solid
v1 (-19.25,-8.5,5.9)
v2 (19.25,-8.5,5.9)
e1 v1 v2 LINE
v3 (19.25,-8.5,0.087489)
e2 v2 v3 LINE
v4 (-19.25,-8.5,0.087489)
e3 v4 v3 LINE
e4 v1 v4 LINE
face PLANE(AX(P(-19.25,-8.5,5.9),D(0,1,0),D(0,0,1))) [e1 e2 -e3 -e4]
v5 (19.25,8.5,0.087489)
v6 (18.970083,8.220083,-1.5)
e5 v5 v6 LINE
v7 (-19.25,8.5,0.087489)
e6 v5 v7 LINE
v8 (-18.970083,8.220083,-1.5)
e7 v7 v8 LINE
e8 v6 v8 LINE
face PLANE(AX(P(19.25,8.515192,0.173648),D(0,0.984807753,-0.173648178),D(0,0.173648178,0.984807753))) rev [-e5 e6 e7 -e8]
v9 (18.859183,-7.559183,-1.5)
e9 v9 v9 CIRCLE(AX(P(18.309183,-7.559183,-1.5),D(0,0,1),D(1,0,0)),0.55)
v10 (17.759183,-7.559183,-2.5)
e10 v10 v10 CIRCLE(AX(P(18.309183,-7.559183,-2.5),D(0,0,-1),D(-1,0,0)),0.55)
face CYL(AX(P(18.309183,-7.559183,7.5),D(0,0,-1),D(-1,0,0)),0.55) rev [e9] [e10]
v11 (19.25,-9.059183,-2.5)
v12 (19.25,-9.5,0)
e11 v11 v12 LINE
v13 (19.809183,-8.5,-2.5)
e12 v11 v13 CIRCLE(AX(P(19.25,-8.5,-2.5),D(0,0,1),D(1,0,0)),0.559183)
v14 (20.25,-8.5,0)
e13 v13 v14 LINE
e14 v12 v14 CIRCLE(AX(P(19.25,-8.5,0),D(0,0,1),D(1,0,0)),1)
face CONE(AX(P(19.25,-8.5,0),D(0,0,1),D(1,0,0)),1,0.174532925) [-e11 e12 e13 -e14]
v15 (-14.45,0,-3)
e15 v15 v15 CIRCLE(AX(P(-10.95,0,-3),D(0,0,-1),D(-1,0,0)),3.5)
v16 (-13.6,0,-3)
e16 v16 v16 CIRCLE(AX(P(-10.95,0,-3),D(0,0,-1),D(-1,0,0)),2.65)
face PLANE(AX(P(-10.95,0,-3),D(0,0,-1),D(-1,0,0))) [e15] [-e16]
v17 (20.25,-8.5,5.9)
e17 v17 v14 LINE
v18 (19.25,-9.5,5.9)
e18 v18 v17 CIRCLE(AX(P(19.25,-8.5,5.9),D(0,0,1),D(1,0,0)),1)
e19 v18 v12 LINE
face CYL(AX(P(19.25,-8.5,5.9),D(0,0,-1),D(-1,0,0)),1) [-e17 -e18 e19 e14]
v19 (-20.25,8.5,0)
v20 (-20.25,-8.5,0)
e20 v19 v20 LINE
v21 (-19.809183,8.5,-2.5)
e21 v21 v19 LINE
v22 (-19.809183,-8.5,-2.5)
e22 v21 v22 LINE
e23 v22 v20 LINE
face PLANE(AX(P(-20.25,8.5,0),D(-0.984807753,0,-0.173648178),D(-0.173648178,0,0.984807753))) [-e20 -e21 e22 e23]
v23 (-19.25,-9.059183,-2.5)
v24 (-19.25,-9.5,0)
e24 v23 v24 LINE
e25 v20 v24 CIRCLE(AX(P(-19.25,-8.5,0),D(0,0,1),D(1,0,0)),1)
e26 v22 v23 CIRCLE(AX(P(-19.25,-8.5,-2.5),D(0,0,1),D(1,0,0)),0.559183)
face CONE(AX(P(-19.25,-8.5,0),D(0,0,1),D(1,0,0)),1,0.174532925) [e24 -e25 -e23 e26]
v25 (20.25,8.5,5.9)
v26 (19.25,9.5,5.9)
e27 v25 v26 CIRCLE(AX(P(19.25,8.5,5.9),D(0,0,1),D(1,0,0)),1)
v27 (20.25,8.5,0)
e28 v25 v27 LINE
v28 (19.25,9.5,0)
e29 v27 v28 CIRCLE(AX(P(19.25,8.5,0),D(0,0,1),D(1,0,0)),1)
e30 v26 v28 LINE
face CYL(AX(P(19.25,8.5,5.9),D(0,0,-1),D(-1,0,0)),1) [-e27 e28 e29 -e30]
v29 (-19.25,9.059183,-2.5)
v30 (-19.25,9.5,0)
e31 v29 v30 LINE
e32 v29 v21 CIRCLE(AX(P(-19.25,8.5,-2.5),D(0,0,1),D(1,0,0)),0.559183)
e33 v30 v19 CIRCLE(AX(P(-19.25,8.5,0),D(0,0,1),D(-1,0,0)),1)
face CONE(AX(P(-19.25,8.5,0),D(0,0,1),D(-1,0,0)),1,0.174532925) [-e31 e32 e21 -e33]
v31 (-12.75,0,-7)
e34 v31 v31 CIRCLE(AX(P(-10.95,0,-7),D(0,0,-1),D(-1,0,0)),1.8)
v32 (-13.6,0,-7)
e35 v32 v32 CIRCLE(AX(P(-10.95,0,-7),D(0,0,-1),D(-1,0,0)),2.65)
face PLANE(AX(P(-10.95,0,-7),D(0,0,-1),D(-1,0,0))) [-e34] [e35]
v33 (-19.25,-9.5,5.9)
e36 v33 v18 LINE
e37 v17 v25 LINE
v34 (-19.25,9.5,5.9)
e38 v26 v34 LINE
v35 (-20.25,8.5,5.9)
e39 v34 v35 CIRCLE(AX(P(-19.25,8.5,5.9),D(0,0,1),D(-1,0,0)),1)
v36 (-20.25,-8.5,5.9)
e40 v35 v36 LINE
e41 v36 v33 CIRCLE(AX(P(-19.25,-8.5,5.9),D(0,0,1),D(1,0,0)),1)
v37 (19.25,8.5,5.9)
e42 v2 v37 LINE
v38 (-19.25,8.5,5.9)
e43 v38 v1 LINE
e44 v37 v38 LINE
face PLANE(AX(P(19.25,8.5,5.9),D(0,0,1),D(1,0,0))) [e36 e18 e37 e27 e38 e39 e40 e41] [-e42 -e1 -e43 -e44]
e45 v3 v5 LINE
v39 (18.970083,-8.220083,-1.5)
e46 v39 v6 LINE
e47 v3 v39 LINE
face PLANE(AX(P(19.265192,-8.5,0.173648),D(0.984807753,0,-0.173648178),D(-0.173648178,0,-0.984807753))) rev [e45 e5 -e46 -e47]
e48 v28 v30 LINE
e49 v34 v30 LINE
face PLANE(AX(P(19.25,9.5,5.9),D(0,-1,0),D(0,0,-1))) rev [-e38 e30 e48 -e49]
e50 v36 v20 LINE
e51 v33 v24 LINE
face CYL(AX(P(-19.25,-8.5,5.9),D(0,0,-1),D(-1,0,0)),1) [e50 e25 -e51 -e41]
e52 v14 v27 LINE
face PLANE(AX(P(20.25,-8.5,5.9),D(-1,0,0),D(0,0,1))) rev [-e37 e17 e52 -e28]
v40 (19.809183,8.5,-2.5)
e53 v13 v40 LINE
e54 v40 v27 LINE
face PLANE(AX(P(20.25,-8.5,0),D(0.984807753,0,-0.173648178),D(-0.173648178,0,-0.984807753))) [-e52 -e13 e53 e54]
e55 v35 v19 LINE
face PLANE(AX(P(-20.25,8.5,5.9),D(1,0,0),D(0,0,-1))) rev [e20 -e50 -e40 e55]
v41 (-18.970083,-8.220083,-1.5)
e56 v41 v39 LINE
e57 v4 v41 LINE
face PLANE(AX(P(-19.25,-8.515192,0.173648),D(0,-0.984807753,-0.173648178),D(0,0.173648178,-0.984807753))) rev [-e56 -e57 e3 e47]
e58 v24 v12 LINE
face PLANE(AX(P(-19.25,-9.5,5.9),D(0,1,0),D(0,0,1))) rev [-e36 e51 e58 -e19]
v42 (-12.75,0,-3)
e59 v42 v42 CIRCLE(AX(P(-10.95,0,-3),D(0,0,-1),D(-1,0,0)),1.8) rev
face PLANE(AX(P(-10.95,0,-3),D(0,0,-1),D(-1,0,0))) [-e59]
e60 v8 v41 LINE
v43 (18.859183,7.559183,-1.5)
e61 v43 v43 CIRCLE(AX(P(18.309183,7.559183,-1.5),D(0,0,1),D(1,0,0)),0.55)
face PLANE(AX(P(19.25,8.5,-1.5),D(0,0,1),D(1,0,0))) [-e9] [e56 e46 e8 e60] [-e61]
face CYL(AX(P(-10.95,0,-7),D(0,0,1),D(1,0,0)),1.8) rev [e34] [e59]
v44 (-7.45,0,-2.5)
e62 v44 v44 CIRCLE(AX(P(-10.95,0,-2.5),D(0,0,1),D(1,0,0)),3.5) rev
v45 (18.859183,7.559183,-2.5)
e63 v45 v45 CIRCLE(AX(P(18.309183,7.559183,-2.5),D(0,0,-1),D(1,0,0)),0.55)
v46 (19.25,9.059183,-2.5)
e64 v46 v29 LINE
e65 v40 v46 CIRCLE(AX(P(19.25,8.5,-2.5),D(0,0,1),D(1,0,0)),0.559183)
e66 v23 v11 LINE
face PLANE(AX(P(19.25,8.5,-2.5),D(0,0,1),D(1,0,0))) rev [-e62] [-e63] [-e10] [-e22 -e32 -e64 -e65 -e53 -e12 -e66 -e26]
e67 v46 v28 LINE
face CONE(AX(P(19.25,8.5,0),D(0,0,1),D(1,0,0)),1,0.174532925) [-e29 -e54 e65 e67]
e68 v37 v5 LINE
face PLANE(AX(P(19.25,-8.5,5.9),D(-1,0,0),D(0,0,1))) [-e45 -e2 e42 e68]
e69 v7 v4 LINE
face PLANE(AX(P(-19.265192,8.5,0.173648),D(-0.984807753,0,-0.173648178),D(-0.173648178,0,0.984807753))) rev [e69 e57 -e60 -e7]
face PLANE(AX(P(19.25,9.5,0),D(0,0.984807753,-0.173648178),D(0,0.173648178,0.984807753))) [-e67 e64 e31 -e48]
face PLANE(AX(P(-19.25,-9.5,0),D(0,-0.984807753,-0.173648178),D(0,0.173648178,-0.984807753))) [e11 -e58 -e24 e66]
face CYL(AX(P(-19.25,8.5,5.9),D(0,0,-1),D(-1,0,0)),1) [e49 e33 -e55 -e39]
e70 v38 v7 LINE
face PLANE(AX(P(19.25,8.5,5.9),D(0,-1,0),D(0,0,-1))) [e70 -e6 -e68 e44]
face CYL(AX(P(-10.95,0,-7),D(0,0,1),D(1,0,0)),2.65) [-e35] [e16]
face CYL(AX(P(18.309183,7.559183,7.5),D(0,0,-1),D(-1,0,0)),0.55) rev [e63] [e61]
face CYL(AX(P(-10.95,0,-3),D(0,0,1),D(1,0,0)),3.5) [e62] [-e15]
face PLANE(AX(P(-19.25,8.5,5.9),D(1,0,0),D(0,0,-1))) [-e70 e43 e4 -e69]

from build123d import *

# Parameters (mm, degrees)
SALIENTE_EXTRUIR1_DEPTH = 5.9
SALIENTE_EXTRUIR2_DEPTH = 2.5
SALIENTE_EXTRUIR2_DRAFT = -10
VACIADO1_START          = -8.5
VACIADO1_DEPTH          = 17
VACIADO1_START_2        = -19.25
VACIADO1_2_DEPTH        = 38.5
SKETCH1_R               = 3.5
BOSS_EXTRUDE1_DEPTH     = 0.5
SKETCH2_R               = 2.65
SKETCH2_R_2             = 1.8
BOSS_EXTRUDE2_DEPTH     = 4
SKETCH3_R               = 0.55
CUT_EXTRUDE1_DEPTH      = 10


with BuildPart() as part:
    # Croquis1 → Saliente-Extruir1 (new body)
    with BuildSketch(Plane.XY):
        with BuildLine():
            Line((-20.25, 8.5), (-20.25, -8.5))
            ThreePointArc((-20.25, -8.5), (-19.957106781, -9.207106781), (-19.25, -9.5))
            Line((-19.25, -9.5), (19.25, -9.5))
            ThreePointArc((19.25, -9.5), (19.957106781, -9.207106781), (20.25, -8.5))
            Line((20.25, -8.5), (20.25, 8.5))
            ThreePointArc((20.25, 8.5), (19.957106781, 9.207106781), (19.25, 9.5))
            Line((19.25, 9.5), (-19.25, 9.5))
            ThreePointArc((-19.25, 9.5), (-19.957106781, 9.207106781), (-20.25, 8.5))
        make_face()
    extrude(amount=SALIENTE_EXTRUIR1_DEPTH)


with BuildPart() as saliente_extruir2_tool:
    # Croquis1<2> → Saliente-Extruir2 (with draft: the straight prism first)
    with BuildSketch(Plane.XY):
        with BuildLine():
            Line((-20.25, 8.5), (-20.25, -8.5))
            ThreePointArc((-20.25, -8.5), (-19.957106781, -9.207106781), (-19.25, -9.5))
            Line((-19.25, -9.5), (19.25, -9.5))
            ThreePointArc((19.25, -9.5), (19.957106781, -9.207106781), (20.25, -8.5))
            Line((20.25, -8.5), (20.25, 8.5))
            ThreePointArc((20.25, 8.5), (19.957106781, 9.207106781), (19.25, 9.5))
            Line((19.25, 9.5), (-19.25, 9.5))
            ThreePointArc((-19.25, 9.5), (-19.957106781, 9.207106781), (-20.25, 8.5))
        make_face()
    extrude(amount=-SALIENTE_EXTRUIR2_DEPTH)
    # Saliente-Extruir2: the draft: its side faces are tilted about the plane it starts from
    saliente_extruir2_sides = [saliente_extruir2_tool.faces().sort_by_distance(p)[0] for p in [
        (0, 9.5, -1.25),
        (-19.957106781, 9.207106781, -1.25),
        (-20.25, 0, -1.25),
        (-19.957106781, -9.207106781, -1.25),
        (0, -9.5, -1.25),
        (19.957106781, -9.207106781, -1.25),
        (20.25, 0, -1.25),
        (19.957106781, 9.207106781, -1.25),
    ]]
    draft(saliente_extruir2_sides, Plane.XY, SALIENTE_EXTRUIR2_DRAFT)


with BuildPart() as part_1:
    add(part.part)

    # Saliente-Extruir2: add saliente_extruir2_tool
    add(saliente_extruir2_tool.part)

    # Vaciado1: read off the stored shape, not the designer's step
    # Vaciado1 outline → Vaciado1 (cut)
    with BuildSketch(Plane(origin=(0, 0, 0), x_dir=(1, 0, 0), z_dir=(0, 1, 0)).offset(VACIADO1_START)):
        Polygon((-19.25, -0.087488664), (-19.25, -5.9), (19.25, -5.9), (19.25, -0.087488664), (18.970082917, 1.5), (-18.970082917, 1.5), align=None)
    extrude(amount=VACIADO1_DEPTH, mode=Mode.SUBTRACT)

    # Vaciado1 2 outline → Vaciado1 2 (add)
    with BuildSketch(Plane.YZ.offset(VACIADO1_START_2)):
        Polygon((8.5, 0.087488664), (8.220082917, -1.5), (8.5, -1.5), align=None)
        Polygon((-8.220082917, -1.5), (-8.5, 0.087488664), (-8.5, -1.5), align=None)
    extrude(amount=VACIADO1_2_DEPTH)

    # Sketch1 → Boss-Extrude1 (add)
    with BuildSketch(Plane(origin=(0, 0, -2.5), x_dir=(-1, 0, 0), z_dir=(0, 0, -1))):
        with Locations(Location((10.95, 0, 0), (0, 0, 180))):
            Circle(SKETCH1_R)
    extrude(amount=BOSS_EXTRUDE1_DEPTH)

    # Sketch2 → Boss-Extrude2 (add)
    with BuildSketch(Plane(origin=(0, 0, -3), x_dir=(-1, 0, 0), z_dir=(0, 0, -1))):
        with Locations((10.95, 0)):
            Circle(SKETCH2_R)
        with Locations((10.95, 0)):
            Circle(SKETCH2_R_2, mode=Mode.SUBTRACT)
    extrude(amount=BOSS_EXTRUDE2_DEPTH)

    # Sketch3 → Cut-Extrude1 (cut)
    with BuildSketch(Plane(origin=(0, 0, -2.5), x_dir=(-1, 0, 0), z_dir=(0, 0, -1))):
        with Locations((-18.309182548, -7.559182548)):
            Circle(SKETCH3_R)
        with Locations(Location((-18.309182548, 7.559182548, 0), (0, 0, 180))):
            Circle(SKETCH3_R)
    extrude(amount=-CUT_EXTRUDE1_DEPTH, mode=Mode.SUBTRACT)


solid = part_1.part
